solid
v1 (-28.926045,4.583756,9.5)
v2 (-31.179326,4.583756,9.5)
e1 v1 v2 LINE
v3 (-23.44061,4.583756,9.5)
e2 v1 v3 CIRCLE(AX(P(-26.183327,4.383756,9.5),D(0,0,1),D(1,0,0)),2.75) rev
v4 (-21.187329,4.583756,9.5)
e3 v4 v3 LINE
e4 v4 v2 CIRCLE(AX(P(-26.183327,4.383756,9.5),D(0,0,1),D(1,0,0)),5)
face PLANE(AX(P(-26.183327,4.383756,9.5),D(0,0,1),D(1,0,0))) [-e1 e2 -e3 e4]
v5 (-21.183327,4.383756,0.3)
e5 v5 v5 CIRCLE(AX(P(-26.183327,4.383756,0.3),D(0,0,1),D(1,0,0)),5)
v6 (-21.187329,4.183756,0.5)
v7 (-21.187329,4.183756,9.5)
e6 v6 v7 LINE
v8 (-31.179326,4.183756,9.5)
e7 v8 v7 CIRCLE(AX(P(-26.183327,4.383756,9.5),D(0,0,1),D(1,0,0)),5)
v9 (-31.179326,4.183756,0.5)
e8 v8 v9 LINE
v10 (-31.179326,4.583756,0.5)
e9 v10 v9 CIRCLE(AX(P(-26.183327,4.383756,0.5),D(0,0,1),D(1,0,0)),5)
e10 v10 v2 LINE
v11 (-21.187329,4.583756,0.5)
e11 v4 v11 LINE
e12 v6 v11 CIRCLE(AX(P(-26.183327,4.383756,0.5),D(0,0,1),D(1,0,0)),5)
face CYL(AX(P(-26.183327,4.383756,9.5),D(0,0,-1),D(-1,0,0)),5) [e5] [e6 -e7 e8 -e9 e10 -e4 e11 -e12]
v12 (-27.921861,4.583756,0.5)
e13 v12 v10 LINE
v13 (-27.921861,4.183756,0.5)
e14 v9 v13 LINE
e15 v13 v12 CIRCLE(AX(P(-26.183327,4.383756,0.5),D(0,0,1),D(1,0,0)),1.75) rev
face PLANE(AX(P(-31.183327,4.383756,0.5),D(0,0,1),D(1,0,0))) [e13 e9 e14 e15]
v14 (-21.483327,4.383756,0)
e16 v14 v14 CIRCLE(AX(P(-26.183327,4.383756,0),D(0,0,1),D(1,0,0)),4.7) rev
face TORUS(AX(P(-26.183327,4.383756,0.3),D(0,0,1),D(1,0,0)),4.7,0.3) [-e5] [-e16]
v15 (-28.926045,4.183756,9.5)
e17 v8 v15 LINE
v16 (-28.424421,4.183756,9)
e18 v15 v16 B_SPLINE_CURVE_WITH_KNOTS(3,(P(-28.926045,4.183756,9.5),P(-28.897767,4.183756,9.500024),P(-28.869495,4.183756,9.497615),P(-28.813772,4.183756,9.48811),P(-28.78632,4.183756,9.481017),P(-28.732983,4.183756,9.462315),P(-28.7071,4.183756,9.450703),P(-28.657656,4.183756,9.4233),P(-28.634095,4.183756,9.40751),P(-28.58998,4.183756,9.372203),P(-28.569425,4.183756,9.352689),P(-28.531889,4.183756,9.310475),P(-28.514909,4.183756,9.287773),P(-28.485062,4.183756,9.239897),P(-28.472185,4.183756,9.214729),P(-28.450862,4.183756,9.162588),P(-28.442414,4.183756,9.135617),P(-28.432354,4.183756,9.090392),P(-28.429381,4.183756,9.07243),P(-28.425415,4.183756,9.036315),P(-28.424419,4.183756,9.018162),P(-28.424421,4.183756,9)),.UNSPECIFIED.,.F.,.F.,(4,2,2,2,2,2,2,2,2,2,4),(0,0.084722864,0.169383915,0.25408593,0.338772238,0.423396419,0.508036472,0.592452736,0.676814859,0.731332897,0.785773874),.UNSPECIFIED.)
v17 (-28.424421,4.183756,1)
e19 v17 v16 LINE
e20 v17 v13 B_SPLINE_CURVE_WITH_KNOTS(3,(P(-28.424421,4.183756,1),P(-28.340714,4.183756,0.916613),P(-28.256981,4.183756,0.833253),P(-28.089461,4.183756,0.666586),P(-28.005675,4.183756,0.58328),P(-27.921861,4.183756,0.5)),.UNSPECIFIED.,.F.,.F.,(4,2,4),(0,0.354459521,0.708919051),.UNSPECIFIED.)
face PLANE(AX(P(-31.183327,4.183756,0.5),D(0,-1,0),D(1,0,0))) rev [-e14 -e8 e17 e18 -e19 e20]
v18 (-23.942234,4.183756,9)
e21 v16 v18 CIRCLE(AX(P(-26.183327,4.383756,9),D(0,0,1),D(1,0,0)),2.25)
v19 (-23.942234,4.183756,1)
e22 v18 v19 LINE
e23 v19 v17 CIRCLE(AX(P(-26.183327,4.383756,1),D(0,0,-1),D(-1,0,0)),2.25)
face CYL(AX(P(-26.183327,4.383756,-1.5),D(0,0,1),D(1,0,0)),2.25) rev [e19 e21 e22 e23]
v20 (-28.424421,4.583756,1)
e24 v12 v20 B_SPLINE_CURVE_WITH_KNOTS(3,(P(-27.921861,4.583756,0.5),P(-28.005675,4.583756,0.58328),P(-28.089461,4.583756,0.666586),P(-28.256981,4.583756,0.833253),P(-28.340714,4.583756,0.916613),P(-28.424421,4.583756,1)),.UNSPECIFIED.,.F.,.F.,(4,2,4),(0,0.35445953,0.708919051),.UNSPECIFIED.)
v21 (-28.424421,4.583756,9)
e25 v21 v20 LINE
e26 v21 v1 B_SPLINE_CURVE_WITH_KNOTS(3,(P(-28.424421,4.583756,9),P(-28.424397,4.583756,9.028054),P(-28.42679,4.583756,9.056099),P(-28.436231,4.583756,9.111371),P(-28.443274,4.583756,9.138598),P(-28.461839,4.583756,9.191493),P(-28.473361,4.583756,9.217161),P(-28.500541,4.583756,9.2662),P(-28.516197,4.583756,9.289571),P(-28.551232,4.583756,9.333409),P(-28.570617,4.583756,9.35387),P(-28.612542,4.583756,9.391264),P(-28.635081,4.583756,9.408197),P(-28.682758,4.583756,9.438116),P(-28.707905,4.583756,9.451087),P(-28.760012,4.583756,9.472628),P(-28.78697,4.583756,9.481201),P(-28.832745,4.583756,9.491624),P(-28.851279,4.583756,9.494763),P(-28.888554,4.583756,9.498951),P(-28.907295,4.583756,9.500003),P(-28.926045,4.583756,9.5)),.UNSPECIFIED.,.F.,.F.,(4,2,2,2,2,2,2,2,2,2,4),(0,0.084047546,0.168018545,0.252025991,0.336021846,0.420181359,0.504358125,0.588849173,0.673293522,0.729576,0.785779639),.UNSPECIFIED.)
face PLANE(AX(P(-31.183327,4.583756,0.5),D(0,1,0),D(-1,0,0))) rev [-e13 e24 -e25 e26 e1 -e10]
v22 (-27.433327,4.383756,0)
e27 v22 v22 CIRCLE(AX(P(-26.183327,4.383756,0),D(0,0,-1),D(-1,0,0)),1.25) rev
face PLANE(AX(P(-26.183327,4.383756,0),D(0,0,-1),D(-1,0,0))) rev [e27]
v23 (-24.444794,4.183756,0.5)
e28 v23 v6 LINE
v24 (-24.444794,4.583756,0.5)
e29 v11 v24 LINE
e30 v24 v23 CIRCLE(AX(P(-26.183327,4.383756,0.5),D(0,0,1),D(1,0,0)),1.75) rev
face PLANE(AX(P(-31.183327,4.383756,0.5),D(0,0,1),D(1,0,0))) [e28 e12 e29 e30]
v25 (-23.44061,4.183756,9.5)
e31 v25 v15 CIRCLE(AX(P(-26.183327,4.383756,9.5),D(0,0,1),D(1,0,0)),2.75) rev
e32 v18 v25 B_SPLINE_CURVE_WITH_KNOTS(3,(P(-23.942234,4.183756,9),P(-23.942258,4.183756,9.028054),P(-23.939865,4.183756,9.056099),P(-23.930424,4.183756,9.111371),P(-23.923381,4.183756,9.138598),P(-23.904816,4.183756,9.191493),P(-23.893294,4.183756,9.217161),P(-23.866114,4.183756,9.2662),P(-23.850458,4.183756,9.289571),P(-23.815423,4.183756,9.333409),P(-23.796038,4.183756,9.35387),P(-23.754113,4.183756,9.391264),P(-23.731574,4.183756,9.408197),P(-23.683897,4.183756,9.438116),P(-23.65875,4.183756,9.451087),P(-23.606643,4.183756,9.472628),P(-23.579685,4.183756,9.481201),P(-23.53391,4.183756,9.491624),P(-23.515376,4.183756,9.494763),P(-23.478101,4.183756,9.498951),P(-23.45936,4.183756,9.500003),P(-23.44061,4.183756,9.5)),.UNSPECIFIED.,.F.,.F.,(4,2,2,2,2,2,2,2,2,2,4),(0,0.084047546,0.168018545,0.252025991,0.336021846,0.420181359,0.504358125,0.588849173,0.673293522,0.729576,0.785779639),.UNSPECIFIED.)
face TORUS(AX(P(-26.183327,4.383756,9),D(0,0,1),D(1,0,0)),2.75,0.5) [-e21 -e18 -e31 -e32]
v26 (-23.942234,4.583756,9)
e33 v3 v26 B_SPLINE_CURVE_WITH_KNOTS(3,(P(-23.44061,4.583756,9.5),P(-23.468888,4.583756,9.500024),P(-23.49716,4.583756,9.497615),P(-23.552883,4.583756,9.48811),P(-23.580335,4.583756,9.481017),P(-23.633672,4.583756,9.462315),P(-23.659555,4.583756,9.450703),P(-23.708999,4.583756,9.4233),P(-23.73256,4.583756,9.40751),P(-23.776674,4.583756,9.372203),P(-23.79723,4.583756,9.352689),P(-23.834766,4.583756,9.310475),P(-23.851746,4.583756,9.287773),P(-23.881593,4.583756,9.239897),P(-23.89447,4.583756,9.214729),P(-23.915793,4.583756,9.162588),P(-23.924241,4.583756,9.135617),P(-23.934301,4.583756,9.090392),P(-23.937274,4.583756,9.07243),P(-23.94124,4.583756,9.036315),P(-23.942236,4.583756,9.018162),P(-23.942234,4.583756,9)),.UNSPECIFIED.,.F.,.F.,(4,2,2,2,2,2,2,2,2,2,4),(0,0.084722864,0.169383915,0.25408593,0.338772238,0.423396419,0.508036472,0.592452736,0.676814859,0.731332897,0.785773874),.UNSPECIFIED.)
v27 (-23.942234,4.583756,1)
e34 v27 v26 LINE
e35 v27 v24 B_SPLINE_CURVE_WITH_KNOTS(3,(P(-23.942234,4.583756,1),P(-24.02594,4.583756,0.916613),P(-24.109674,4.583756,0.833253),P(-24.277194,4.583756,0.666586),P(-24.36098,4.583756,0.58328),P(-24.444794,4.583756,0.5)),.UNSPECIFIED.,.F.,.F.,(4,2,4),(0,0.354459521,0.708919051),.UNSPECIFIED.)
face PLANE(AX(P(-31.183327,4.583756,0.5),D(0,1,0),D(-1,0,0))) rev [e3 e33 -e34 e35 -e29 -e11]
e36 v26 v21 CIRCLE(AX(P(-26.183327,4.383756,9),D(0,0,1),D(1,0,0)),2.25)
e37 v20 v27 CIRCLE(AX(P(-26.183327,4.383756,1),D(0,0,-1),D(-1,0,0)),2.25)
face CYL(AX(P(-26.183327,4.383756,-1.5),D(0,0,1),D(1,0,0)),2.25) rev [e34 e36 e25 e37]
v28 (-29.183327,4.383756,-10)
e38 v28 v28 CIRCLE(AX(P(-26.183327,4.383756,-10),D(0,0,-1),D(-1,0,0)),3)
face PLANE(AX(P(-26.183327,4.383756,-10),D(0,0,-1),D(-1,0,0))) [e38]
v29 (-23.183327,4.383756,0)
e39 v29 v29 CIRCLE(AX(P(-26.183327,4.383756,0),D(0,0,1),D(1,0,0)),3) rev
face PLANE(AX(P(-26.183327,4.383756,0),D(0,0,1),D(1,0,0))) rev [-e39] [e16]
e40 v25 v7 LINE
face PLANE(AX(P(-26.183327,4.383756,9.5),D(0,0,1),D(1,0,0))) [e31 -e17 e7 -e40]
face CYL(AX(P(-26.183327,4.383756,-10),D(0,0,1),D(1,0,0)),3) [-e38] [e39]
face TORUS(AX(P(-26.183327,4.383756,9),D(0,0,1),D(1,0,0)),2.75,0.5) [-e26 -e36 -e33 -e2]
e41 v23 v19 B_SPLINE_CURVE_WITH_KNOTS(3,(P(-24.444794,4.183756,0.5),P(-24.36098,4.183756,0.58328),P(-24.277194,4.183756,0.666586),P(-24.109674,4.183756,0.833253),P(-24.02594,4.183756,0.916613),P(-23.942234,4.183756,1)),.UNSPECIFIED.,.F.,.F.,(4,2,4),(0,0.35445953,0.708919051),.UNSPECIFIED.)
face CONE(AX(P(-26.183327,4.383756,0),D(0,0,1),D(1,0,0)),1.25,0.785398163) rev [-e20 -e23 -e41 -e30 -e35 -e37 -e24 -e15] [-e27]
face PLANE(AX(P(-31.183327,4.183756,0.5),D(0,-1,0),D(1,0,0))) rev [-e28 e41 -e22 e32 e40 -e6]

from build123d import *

# Parameters (mm, degrees)
ESBO_O1_R                = 5
RESSALTO_EXTRUS_O1_DEPTH = 9.5
ESBO_O2_R                = 2.25
CORTE_EXTRUS_O1_DEPTH    = 11
ESBO_O3_R                = 3
RESSALTO_EXTRUS_O2_DEPTH = 10
CORTE_EXTRUS_O2_DEPTH    = 9
FILETE1_R                = 0.5
FILETE2_R                = 0.3
CHANFRO1_SIZE            = 1


with BuildPart() as part:
    # Esboço1 → Ressalto-extrusão1 (new body)
    with BuildSketch(Plane.XY):
        with Locations((-26.183327478, 4.383756345)):
            Circle(ESBO_O1_R)
    extrude(amount=RESSALTO_EXTRUS_O1_DEPTH)

    # Esboço2 → Corte-extrusão1 (cut)
    with BuildSketch(Plane.XY.offset(9.5)):
        with Locations((-26.183327478, 4.383756345)):
            Circle(ESBO_O2_R)
    extrude(amount=-CORTE_EXTRUS_O1_DEPTH, mode=Mode.SUBTRACT)

    # Esboço3 → Ressalto-extrusão2 (add)
    with BuildSketch(Plane(origin=(0, 0, 0), x_dir=(-1, 0, 0), z_dir=(0, 0, -1))):
        with Locations(Location((26.183327478, 4.383756345, 0), (0, 0, 180))):
            Circle(ESBO_O3_R)
    extrude(amount=RESSALTO_EXTRUS_O2_DEPTH)

    # Esboço4 → Corte-extrusão2 (cut)
    with BuildSketch(Plane.XY.offset(9.5)):
        with BuildLine():
            Line((-31.183327478, 4.583756345), (-21.183327478, 4.583756345))
            ThreePointArc((-21.183327478, 4.583756345), (-20.983327478, 4.383756345), (-21.183327478, 4.183756345))
            Line((-21.183327478, 4.183756345), (-31.183327478, 4.183756345))
            ThreePointArc((-31.183327478, 4.183756345), (-31.383327478, 4.383756345), (-31.183327478, 4.583756345))
        make_face()
    extrude(amount=-CORTE_EXTRUS_O2_DEPTH, mode=Mode.SUBTRACT)

    # Filete1
    filete1_edges = [part.edges().sort_by_distance(p)[0] for p in [
        (-26.183327478, 2.133756345, 9.5),
        (-26.183327478, 6.633756345, 9.5),
    ]]
    fillet(filete1_edges, radius=FILETE1_R)

    # Filete2
    filete2_edges = [part.edges().sort_by_distance(p)[0] for p in [
        (-31.183327478, 4.383756345, 0),
    ]]
    fillet(filete2_edges, radius=FILETE2_R)

    # Chanfro1
    # the kernel refuses this chamfer: 1 mm, written as the material it adds along each edge
    with BuildSketch(Plane(origin=(-26.183327478, 4.383756345, 0), x_dir=(1, 0, 0), z_dir=(0, -1, 0))) as chanfro1_piece_1_section:
        Polygon((2.25, CHANFRO1_SIZE), (2.25 - CHANFRO1_SIZE, 0), (2.25, 0), align=None)
    chanfro1_piece_1 = revolve(axis=Axis((-26.183327478, 4.383756345, 0), (0, 0, 1)), mode=Mode.PRIVATE)
    chanfro1_piece_1 = split(chanfro1_piece_1, bisect_by=Plane(origin=(-24.32601133, 4.383756345, 0.5), z_dir=(0, 0, -1)), keep=Keep.TOP, mode=Mode.PRIVATE)
    add(chanfro1_piece_1)
    with BuildSketch(Plane(origin=(-26.183327478, 4.383756345, 0), x_dir=(1, 0, 0), z_dir=(0, -1, 0))) as chanfro1_piece_2_section:
        Polygon((2.25, CHANFRO1_SIZE), (2.25 - CHANFRO1_SIZE, 0), (2.25, 0), align=None)
    chanfro1_piece_2 = revolve(axis=Axis((-26.183327478, 4.383756345, 0), (0, 0, 1)), mode=Mode.PRIVATE)
    chanfro1_piece_2 = split(chanfro1_piece_2, bisect_by=Plane(origin=(-26.183327478, 4.583756345, 0.743524391), z_dir=(0, 1, 0)), keep=Keep.TOP, mode=Mode.PRIVATE)
    add(chanfro1_piece_2)
    with BuildSketch(Plane(origin=(-26.183327478, 4.383756345, 0), x_dir=(1, 0, 0), z_dir=(0, -1, 0))) as chanfro1_piece_3_section:
        Polygon((2.25, CHANFRO1_SIZE), (2.25 - CHANFRO1_SIZE, 0), (2.25, 0), align=None)
    chanfro1_piece_3 = revolve(axis=Axis((-26.183327478, 4.383756345, 0), (0, 0, 1)), mode=Mode.PRIVATE)
    chanfro1_piece_3 = split(chanfro1_piece_3, bisect_by=Plane(origin=(-26.183327478, 4.183756345, 0.743524391), z_dir=(0, -1, 0)), keep=Keep.TOP, mode=Mode.PRIVATE)
    add(chanfro1_piece_3)


solid = part.part
